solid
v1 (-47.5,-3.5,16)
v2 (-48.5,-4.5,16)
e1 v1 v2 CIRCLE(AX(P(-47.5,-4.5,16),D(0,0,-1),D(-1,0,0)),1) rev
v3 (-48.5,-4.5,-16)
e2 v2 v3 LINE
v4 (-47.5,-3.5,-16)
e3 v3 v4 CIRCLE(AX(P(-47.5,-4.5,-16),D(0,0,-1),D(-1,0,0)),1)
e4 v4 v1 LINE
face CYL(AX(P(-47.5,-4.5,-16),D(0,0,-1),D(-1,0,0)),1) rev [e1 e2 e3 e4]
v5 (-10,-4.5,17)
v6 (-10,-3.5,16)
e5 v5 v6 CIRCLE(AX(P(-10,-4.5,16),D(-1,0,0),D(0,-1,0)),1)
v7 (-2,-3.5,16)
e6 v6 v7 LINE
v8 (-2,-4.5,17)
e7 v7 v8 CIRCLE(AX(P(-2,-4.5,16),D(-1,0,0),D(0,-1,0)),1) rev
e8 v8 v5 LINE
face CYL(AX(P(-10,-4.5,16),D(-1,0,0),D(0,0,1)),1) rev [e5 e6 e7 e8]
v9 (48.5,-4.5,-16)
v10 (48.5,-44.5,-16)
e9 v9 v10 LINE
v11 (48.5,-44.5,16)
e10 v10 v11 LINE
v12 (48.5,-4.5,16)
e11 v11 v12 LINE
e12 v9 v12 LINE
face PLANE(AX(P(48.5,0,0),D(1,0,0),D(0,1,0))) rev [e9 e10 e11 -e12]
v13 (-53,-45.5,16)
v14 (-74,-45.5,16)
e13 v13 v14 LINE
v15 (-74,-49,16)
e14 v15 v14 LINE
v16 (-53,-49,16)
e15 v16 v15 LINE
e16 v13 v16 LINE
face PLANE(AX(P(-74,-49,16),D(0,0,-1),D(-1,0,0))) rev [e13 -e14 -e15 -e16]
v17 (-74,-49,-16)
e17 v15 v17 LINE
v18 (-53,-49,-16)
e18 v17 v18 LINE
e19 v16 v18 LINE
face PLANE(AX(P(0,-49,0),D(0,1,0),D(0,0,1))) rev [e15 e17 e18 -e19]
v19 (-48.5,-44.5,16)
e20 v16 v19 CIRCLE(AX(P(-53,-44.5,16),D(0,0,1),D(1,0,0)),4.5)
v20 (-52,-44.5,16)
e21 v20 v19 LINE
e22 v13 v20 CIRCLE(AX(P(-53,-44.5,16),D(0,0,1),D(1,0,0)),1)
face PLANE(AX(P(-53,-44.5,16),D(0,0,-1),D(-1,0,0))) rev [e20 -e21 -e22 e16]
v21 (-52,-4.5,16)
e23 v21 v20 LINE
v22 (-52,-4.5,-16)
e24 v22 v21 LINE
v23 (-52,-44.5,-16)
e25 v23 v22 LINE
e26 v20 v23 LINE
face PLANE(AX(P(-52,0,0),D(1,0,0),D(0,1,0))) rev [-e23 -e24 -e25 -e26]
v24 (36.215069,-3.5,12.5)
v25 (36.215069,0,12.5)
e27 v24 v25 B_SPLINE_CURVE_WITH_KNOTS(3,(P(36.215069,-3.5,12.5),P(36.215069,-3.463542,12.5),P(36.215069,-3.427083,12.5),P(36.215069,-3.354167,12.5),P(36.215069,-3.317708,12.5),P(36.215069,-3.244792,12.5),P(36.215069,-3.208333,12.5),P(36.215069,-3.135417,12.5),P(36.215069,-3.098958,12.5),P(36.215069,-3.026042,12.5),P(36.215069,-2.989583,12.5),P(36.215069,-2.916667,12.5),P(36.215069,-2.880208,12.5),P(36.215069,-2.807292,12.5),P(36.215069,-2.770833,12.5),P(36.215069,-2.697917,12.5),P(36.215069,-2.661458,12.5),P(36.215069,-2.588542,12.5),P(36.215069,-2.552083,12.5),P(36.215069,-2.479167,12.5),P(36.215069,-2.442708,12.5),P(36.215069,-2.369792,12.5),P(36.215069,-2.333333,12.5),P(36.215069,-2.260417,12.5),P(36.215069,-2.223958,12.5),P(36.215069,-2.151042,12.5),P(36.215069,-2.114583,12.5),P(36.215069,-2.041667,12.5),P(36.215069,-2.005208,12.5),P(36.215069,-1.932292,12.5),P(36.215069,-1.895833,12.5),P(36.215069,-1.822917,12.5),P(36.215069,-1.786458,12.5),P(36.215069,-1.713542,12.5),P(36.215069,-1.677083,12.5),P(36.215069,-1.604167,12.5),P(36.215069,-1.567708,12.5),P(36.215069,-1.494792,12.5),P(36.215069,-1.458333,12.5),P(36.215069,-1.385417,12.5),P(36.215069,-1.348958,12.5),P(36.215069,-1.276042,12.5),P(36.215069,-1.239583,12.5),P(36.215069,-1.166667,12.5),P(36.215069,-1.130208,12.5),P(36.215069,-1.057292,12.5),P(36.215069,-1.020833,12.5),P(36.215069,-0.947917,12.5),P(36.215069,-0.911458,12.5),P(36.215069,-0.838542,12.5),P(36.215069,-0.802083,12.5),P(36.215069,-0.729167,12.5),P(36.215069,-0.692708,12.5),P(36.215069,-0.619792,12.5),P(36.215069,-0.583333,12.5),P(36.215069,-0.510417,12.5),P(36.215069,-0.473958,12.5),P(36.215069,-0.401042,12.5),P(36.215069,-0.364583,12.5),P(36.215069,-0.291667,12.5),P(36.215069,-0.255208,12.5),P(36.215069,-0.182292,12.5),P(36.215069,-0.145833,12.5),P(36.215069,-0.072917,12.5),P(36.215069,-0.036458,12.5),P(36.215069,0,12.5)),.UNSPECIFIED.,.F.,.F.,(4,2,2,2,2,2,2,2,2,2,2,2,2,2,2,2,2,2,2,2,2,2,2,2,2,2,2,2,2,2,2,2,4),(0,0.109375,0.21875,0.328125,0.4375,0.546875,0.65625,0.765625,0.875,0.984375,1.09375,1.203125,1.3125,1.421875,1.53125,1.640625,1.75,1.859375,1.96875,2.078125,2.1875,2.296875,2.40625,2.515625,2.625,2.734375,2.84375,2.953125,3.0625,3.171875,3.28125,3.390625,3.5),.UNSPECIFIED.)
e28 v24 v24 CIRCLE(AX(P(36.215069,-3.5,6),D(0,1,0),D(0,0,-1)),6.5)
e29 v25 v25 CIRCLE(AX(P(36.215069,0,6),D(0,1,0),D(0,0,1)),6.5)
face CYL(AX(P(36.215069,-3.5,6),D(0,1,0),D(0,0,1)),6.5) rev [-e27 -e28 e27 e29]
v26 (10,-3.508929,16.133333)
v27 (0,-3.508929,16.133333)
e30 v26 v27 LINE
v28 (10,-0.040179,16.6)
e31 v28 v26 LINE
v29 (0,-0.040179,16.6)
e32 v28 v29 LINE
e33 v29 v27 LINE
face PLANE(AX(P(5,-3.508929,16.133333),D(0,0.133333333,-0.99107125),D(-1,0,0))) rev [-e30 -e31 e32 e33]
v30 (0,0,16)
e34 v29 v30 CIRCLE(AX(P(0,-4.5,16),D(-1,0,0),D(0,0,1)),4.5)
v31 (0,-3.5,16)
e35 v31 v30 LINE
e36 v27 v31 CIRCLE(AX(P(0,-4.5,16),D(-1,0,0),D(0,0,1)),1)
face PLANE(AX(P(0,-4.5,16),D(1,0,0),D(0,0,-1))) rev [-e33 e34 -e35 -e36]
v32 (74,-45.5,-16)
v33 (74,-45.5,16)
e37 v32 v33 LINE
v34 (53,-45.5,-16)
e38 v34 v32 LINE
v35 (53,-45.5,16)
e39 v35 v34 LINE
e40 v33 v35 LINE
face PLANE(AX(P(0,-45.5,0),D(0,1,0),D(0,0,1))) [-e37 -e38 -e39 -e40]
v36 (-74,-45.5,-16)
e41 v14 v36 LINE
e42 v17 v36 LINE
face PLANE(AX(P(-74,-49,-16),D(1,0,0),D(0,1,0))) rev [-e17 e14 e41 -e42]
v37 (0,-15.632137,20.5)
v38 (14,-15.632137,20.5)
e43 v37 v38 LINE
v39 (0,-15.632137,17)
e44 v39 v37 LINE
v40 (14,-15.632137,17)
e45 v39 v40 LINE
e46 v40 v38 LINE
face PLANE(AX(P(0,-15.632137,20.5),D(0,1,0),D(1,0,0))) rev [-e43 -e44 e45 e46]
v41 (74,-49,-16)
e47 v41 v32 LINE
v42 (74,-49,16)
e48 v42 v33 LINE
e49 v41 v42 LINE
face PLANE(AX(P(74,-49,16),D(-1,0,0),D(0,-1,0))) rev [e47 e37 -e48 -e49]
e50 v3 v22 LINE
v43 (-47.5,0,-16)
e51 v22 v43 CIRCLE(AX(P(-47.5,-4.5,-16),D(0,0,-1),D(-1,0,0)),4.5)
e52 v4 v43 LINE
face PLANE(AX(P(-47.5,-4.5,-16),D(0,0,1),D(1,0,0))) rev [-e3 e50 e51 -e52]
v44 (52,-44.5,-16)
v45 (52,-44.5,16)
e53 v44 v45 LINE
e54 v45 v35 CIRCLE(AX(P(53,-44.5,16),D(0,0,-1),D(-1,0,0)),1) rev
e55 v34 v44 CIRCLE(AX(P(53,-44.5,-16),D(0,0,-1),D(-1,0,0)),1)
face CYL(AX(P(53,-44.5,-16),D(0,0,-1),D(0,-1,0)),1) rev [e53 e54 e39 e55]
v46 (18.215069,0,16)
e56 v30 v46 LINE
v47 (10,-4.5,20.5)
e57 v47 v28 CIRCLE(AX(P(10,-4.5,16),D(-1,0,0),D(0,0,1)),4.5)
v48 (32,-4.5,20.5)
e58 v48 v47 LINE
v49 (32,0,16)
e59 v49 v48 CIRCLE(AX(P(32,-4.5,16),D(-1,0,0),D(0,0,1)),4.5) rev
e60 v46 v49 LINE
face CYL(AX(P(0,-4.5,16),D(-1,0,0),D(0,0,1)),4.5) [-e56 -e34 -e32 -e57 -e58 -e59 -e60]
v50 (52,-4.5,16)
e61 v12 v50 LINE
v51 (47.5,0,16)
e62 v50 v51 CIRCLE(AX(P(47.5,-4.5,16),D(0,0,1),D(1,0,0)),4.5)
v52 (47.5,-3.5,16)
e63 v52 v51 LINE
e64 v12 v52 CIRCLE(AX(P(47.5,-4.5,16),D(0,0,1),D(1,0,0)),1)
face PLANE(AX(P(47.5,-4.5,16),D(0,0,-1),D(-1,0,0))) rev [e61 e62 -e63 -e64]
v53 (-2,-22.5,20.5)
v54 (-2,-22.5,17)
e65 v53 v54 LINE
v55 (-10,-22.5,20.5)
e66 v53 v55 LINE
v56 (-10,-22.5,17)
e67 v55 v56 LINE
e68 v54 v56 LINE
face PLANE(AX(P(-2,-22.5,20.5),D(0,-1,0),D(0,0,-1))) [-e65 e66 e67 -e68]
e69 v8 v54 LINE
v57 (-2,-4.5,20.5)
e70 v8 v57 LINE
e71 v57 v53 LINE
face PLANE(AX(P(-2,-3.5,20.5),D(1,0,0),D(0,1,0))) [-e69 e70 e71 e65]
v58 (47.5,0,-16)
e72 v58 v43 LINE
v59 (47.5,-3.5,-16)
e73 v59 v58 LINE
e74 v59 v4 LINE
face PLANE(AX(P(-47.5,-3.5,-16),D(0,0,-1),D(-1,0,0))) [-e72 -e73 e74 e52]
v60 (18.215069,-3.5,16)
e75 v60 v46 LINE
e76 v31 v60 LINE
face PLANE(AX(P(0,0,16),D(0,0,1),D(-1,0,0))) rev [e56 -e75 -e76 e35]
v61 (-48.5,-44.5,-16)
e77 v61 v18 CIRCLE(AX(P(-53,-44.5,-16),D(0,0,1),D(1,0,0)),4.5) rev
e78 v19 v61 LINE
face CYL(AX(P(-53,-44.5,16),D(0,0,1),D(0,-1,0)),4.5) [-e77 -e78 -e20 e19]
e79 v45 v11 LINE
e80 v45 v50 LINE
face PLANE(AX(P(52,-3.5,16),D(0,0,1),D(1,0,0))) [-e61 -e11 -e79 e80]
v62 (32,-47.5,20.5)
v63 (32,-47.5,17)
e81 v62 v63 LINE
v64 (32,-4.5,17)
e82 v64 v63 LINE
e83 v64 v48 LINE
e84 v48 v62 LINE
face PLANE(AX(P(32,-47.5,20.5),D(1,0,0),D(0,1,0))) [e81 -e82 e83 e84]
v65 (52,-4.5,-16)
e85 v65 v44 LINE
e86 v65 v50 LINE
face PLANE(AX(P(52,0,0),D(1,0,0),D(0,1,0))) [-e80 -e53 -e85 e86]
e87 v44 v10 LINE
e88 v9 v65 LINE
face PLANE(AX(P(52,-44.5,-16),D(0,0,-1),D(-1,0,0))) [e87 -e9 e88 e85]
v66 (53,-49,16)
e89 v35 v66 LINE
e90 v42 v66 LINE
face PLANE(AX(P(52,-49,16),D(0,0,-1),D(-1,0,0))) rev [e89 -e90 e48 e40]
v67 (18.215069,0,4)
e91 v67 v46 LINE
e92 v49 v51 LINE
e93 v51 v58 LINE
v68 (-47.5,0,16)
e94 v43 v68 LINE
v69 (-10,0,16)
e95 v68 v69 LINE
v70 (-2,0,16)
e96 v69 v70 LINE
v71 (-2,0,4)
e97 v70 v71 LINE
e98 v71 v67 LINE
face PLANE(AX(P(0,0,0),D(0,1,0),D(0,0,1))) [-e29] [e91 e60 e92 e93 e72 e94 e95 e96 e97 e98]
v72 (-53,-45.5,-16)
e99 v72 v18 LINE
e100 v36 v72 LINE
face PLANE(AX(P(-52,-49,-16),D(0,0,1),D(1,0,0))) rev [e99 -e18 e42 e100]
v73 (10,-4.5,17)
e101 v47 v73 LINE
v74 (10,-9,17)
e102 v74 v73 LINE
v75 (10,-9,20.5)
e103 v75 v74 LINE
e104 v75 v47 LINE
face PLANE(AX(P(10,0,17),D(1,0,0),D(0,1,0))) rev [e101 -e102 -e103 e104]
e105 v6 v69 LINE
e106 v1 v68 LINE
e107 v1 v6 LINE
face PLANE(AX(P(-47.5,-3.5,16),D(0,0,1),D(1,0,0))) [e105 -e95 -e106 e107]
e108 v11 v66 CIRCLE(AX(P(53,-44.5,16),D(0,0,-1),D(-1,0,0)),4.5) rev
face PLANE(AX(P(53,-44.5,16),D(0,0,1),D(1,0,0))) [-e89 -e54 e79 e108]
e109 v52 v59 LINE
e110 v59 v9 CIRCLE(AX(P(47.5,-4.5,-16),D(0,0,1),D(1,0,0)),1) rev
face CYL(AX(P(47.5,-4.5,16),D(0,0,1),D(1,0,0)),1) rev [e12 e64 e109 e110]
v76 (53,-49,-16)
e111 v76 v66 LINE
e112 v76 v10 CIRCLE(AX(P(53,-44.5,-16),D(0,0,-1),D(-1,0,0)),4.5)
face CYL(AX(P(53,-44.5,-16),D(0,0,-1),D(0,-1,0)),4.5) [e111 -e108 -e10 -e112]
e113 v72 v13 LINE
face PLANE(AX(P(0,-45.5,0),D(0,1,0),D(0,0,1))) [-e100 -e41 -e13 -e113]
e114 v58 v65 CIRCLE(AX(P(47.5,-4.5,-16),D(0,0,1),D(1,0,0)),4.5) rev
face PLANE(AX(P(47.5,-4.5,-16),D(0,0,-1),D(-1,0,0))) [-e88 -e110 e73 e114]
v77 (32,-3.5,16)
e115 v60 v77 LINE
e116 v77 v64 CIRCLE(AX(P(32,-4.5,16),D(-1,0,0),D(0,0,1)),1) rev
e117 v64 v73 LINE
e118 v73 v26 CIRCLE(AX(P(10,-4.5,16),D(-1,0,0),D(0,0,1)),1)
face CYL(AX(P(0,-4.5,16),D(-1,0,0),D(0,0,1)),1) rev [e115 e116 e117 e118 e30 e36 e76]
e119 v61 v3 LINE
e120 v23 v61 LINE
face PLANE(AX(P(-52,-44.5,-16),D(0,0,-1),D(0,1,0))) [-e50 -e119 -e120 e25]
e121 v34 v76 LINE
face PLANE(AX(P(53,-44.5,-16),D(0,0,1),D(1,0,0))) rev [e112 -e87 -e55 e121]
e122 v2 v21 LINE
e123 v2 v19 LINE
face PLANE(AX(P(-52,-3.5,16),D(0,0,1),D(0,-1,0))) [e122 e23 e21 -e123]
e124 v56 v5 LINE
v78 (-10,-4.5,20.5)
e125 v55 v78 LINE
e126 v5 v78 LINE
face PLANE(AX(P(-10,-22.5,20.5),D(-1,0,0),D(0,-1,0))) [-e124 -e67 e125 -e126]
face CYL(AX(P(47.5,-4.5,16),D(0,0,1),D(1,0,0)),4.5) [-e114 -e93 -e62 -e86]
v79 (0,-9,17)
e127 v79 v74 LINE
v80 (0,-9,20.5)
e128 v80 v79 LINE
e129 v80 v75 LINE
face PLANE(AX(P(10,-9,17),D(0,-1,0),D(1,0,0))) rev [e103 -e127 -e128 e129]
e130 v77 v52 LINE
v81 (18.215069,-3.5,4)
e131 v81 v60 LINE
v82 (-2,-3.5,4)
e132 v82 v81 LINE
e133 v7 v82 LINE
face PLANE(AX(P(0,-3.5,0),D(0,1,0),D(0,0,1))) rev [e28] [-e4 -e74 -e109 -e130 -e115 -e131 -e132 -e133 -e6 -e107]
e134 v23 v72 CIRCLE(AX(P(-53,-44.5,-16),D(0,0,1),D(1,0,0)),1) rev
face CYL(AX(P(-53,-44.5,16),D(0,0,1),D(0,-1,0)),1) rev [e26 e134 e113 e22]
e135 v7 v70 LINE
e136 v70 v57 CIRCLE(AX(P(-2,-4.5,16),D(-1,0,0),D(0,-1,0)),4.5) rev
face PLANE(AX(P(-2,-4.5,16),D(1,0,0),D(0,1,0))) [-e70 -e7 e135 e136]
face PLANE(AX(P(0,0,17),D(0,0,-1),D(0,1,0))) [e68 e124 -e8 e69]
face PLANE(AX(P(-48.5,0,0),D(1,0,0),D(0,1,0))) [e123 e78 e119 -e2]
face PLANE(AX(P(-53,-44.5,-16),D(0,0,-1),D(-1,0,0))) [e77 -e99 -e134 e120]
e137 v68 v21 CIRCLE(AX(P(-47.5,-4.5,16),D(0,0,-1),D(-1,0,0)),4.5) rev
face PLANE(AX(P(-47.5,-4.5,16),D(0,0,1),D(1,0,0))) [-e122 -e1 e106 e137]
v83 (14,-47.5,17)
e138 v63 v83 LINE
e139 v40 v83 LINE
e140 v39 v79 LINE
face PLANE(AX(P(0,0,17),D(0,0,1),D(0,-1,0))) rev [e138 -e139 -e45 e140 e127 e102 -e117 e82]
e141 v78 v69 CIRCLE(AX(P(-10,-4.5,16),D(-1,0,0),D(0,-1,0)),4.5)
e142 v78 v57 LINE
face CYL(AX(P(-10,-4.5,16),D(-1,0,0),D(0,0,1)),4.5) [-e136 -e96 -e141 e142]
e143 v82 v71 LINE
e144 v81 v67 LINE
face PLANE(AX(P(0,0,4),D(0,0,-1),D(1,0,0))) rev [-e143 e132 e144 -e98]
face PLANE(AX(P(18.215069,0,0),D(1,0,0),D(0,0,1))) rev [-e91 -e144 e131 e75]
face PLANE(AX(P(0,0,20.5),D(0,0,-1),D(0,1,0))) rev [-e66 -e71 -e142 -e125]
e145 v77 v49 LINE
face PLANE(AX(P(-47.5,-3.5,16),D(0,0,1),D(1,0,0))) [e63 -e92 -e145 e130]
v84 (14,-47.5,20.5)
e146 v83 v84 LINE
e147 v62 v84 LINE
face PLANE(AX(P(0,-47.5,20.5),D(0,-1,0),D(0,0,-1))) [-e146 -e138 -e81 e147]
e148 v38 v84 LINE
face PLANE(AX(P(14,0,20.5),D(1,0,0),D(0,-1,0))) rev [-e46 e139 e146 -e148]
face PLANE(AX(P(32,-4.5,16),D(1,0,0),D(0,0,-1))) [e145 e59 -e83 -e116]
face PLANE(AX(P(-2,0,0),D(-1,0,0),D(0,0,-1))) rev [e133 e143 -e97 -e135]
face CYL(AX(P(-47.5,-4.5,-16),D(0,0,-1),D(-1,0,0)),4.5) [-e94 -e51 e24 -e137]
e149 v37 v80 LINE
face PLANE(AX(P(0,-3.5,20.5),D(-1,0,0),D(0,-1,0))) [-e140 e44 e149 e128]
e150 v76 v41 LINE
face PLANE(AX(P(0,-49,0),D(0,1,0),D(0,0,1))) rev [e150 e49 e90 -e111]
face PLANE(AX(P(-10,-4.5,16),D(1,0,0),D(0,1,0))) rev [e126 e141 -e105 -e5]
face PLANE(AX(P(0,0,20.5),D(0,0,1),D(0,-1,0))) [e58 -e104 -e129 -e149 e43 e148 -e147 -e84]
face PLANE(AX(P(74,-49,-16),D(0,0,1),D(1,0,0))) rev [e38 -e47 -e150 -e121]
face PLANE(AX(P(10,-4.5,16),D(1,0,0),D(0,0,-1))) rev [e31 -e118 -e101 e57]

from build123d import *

# Parameters (mm, degrees)
SKETCH1_W               = 95
SKETCH1_H               = 32
BASE_FLANGE1_DEPTH      = 3.5
EDGE_FLANGE1_DEPTH      = 32
EDGE_FLANGE1_BEND_DEPTH = 32
EDGE_FLANGE2_DEPTH      = 32
EDGE_FLANGE2_BEND_DEPTH = 32
EDGE_FLANGE3_DEPTH      = 8
EDGE_FLANGE4_DEPTH      = 32
SKETCH30_R              = 6.5
SKETCH30_R_2            = 4
SKETCH30_W              = 20.215069336
SKETCH30_H              = 12
CUT_EXTRUDE1_DEPTH      = 10
CUT_EXTRUDE2_OUTLINE_W  = 31.867862703
CUT_EXTRUDE2_OUTLINE_H  = 3.5
CUT_EXTRUDE2_DEPTH      = 14
CUT_EXTRUDE2_2_DEPTH    = 10


# Read off the part's stored shape, not the designer's step: Cut-Extrude2
# Sheet-metal steps are written as plain solids
with BuildPart() as part:
    # Sketch1 → Base-Flange1 (new body)
    with BuildSketch(Plane(origin=(0, 0, 0), x_dir=(1, 0, 0), z_dir=(0, 1, 0))):
        Rectangle(SKETCH1_W, SKETCH1_H)
    extrude(amount=-BASE_FLANGE1_DEPTH)

    # Edge-Flange1 section (across the edge) → Edge-Flange1 (add)
    with BuildSketch(Plane(origin=(48.5, -3.5, -16), x_dir=(-1, 0, 0), z_dir=(0, 0, 1))):
        with BuildLine():
            Line((-3.5, 1), (-3.5, 41))
            Line((-3.5, 41), (0, 41))
            Line((0, 41), (0, 1))
            ThreePointArc((0, 1), (0.292893219, 0.292893219), (1, 0))
            Line((1, 0), (1, -3.5))
            ThreePointArc((1, -3.5), (-2.181980515, -2.181980515), (-3.5, 1))
        make_face()
    extrude(amount=EDGE_FLANGE1_DEPTH)

    # Edge-Flange1 section 2 (across the edge) → Edge-Flange1 bend (add)
    with BuildSketch(Plane(origin=(-48.5, -3.5, 16), x_dir=(1, 0, 0), z_dir=(0, 0, -1))):
        with BuildLine():
            Line((-3.5, 1), (-3.5, 41))
            Line((-3.5, 41), (0, 41))
            Line((0, 41), (0, 1))
            ThreePointArc((0, 1), (0.292893219, 0.292893219), (1, 0))
            Line((1, 0), (1, -3.5))
            ThreePointArc((1, -3.5), (-2.181980515, -2.181980515), (-3.5, 1))
        make_face()
    extrude(amount=EDGE_FLANGE1_BEND_DEPTH)

    # Edge-Flange2 section (across the edge) → Edge-Flange2 (add)
    with BuildSketch(Plane(origin=(52, -45.5, 16), x_dir=(0, 1, 0), z_dir=(0, 0, -1))):
        with BuildLine():
            Line((-3.5, 1), (-3.5, 22))
            Line((-3.5, 22), (0, 22))
            Line((0, 22), (0, 1))
            ThreePointArc((0, 1), (0.292893219, 0.292893219), (1, 0))
            Line((1, 0), (1, -3.5))
            ThreePointArc((1, -3.5), (-2.181980515, -2.181980515), (-3.5, 1))
        make_face()
    extrude(amount=EDGE_FLANGE2_DEPTH)

    # Edge-Flange2 section 2 (across the edge) → Edge-Flange2 bend (add)
    with BuildSketch(Plane(origin=(-52, -45.5, -16), x_dir=(0, 1, 0), z_dir=(0, 0, 1))):
        with BuildLine():
            Line((-3.5, 1), (-3.5, 22))
            Line((-3.5, 22), (0, 22))
            Line((0, 22), (0, 1))
            ThreePointArc((0, 1), (0.292893219, 0.292893219), (1, 0))
            Line((1, 0), (1, -3.5))
            ThreePointArc((1, -3.5), (-2.181980515, -2.181980515), (-3.5, 1))
        make_face()
    extrude(amount=EDGE_FLANGE2_BEND_DEPTH)

    # Edge-Flange3 section (across the edge) → Edge-Flange3 (add)
    with BuildSketch(Plane(origin=(-2, -3.5, 17), x_dir=(0, 0, -1), z_dir=(-1, 0, 0))):
        with BuildLine():
            Line((-3.5, 1), (-3.5, 19))
            Line((-3.5, 19), (0, 19))
            Line((0, 19), (0, 1))
            ThreePointArc((0, 1), (0.292893219, 0.292893219), (1, 0))
            Line((1, 0), (1, -3.5))
            ThreePointArc((1, -3.5), (-2.181980515, -2.181980515), (-3.5, 1))
        make_face()
    extrude(amount=EDGE_FLANGE3_DEPTH)

    # Edge-Flange4 section (across the edge) → Edge-Flange4 (add)
    with BuildSketch(Plane(origin=(32, -3.5, 17), x_dir=(0, 0, -1), z_dir=(-1, 0, 0))):
        with BuildLine():
            Line((-3.5, 1), (-3.5, 44))
            Line((-3.5, 44), (0, 44))
            Line((0, 44), (0, 1))
            ThreePointArc((0, 1), (0.292893219, 0.292893219), (1, 0))
            Line((1, 0), (1, -3.5))
            ThreePointArc((1, -3.5), (-2.181980515, -2.181980515), (-3.5, 1))
        make_face()
    extrude(amount=EDGE_FLANGE4_DEPTH)

    # Sketch30 → Cut-Extrude1 (cut)
    # profile 1 of 2: a face of its own
    with BuildSketch(Plane(origin=(0, 0, 0), x_dir=(1, 0, 0), z_dir=(0, 1, 0))):
        with Locations(Location((36.215069336, -6, 0), (0, 0, 270))):
            Circle(SKETCH30_R)
        with Locations((36.215069336, -6)):
            Circle(SKETCH30_R_2, mode=Mode.SUBTRACT)
    # profile 2 of 2: a face of its own
    with BuildSketch(Plane(origin=(0, 0, 0), x_dir=(1, 0, 0), z_dir=(0, 1, 0))):
        with Locations((8.107534668, -10)):
            Rectangle(SKETCH30_W, SKETCH30_H)
    extrude(amount=-CUT_EXTRUDE1_DEPTH, mode=Mode.SUBTRACT)


with BuildPart() as cut_extrude1_kept_piece:
    # of the separate pieces the step leaves, the one the design keeps (cut_extrude1_pieces_kept)
    add(part.part.solids().sort_by_distance((-47.5, -3.5, -16))[0])

    # Cut-Extrude2 outline → Cut-Extrude2 (cut)
    with BuildSketch(Plane.YZ):
        with Locations((-31.566068648, 18.75)):
            Rectangle(CUT_EXTRUDE2_OUTLINE_W, CUT_EXTRUDE2_OUTLINE_H)
    extrude(amount=CUT_EXTRUDE2_DEPTH, mode=Mode.SUBTRACT)

    # Cut-Extrude2 2 outline → Cut-Extrude2 2 (cut)
    with BuildSketch(Plane.YZ):
        with BuildLine():
            Line((-9, 20.5), (-9, 17))
            Line((-9, 17), (-4.5, 17))
            ThreePointArc((-4.5, 17), (-3.841719411, 16.752772652), (-3.50892875, 16.133333333))
            Line((-3.50892875, 16.133333333), (-0.040179376, 16.6))
            ThreePointArc((-0.040179376, 16.6), (-1.537737352, 19.387476937), (-4.5, 20.5))
            Line((-4.5, 20.5), (-9, 20.5))
        make_face()
    extrude(amount=CUT_EXTRUDE2_2_DEPTH, mode=Mode.SUBTRACT)


solid = cut_extrude1_kept_piece.part
